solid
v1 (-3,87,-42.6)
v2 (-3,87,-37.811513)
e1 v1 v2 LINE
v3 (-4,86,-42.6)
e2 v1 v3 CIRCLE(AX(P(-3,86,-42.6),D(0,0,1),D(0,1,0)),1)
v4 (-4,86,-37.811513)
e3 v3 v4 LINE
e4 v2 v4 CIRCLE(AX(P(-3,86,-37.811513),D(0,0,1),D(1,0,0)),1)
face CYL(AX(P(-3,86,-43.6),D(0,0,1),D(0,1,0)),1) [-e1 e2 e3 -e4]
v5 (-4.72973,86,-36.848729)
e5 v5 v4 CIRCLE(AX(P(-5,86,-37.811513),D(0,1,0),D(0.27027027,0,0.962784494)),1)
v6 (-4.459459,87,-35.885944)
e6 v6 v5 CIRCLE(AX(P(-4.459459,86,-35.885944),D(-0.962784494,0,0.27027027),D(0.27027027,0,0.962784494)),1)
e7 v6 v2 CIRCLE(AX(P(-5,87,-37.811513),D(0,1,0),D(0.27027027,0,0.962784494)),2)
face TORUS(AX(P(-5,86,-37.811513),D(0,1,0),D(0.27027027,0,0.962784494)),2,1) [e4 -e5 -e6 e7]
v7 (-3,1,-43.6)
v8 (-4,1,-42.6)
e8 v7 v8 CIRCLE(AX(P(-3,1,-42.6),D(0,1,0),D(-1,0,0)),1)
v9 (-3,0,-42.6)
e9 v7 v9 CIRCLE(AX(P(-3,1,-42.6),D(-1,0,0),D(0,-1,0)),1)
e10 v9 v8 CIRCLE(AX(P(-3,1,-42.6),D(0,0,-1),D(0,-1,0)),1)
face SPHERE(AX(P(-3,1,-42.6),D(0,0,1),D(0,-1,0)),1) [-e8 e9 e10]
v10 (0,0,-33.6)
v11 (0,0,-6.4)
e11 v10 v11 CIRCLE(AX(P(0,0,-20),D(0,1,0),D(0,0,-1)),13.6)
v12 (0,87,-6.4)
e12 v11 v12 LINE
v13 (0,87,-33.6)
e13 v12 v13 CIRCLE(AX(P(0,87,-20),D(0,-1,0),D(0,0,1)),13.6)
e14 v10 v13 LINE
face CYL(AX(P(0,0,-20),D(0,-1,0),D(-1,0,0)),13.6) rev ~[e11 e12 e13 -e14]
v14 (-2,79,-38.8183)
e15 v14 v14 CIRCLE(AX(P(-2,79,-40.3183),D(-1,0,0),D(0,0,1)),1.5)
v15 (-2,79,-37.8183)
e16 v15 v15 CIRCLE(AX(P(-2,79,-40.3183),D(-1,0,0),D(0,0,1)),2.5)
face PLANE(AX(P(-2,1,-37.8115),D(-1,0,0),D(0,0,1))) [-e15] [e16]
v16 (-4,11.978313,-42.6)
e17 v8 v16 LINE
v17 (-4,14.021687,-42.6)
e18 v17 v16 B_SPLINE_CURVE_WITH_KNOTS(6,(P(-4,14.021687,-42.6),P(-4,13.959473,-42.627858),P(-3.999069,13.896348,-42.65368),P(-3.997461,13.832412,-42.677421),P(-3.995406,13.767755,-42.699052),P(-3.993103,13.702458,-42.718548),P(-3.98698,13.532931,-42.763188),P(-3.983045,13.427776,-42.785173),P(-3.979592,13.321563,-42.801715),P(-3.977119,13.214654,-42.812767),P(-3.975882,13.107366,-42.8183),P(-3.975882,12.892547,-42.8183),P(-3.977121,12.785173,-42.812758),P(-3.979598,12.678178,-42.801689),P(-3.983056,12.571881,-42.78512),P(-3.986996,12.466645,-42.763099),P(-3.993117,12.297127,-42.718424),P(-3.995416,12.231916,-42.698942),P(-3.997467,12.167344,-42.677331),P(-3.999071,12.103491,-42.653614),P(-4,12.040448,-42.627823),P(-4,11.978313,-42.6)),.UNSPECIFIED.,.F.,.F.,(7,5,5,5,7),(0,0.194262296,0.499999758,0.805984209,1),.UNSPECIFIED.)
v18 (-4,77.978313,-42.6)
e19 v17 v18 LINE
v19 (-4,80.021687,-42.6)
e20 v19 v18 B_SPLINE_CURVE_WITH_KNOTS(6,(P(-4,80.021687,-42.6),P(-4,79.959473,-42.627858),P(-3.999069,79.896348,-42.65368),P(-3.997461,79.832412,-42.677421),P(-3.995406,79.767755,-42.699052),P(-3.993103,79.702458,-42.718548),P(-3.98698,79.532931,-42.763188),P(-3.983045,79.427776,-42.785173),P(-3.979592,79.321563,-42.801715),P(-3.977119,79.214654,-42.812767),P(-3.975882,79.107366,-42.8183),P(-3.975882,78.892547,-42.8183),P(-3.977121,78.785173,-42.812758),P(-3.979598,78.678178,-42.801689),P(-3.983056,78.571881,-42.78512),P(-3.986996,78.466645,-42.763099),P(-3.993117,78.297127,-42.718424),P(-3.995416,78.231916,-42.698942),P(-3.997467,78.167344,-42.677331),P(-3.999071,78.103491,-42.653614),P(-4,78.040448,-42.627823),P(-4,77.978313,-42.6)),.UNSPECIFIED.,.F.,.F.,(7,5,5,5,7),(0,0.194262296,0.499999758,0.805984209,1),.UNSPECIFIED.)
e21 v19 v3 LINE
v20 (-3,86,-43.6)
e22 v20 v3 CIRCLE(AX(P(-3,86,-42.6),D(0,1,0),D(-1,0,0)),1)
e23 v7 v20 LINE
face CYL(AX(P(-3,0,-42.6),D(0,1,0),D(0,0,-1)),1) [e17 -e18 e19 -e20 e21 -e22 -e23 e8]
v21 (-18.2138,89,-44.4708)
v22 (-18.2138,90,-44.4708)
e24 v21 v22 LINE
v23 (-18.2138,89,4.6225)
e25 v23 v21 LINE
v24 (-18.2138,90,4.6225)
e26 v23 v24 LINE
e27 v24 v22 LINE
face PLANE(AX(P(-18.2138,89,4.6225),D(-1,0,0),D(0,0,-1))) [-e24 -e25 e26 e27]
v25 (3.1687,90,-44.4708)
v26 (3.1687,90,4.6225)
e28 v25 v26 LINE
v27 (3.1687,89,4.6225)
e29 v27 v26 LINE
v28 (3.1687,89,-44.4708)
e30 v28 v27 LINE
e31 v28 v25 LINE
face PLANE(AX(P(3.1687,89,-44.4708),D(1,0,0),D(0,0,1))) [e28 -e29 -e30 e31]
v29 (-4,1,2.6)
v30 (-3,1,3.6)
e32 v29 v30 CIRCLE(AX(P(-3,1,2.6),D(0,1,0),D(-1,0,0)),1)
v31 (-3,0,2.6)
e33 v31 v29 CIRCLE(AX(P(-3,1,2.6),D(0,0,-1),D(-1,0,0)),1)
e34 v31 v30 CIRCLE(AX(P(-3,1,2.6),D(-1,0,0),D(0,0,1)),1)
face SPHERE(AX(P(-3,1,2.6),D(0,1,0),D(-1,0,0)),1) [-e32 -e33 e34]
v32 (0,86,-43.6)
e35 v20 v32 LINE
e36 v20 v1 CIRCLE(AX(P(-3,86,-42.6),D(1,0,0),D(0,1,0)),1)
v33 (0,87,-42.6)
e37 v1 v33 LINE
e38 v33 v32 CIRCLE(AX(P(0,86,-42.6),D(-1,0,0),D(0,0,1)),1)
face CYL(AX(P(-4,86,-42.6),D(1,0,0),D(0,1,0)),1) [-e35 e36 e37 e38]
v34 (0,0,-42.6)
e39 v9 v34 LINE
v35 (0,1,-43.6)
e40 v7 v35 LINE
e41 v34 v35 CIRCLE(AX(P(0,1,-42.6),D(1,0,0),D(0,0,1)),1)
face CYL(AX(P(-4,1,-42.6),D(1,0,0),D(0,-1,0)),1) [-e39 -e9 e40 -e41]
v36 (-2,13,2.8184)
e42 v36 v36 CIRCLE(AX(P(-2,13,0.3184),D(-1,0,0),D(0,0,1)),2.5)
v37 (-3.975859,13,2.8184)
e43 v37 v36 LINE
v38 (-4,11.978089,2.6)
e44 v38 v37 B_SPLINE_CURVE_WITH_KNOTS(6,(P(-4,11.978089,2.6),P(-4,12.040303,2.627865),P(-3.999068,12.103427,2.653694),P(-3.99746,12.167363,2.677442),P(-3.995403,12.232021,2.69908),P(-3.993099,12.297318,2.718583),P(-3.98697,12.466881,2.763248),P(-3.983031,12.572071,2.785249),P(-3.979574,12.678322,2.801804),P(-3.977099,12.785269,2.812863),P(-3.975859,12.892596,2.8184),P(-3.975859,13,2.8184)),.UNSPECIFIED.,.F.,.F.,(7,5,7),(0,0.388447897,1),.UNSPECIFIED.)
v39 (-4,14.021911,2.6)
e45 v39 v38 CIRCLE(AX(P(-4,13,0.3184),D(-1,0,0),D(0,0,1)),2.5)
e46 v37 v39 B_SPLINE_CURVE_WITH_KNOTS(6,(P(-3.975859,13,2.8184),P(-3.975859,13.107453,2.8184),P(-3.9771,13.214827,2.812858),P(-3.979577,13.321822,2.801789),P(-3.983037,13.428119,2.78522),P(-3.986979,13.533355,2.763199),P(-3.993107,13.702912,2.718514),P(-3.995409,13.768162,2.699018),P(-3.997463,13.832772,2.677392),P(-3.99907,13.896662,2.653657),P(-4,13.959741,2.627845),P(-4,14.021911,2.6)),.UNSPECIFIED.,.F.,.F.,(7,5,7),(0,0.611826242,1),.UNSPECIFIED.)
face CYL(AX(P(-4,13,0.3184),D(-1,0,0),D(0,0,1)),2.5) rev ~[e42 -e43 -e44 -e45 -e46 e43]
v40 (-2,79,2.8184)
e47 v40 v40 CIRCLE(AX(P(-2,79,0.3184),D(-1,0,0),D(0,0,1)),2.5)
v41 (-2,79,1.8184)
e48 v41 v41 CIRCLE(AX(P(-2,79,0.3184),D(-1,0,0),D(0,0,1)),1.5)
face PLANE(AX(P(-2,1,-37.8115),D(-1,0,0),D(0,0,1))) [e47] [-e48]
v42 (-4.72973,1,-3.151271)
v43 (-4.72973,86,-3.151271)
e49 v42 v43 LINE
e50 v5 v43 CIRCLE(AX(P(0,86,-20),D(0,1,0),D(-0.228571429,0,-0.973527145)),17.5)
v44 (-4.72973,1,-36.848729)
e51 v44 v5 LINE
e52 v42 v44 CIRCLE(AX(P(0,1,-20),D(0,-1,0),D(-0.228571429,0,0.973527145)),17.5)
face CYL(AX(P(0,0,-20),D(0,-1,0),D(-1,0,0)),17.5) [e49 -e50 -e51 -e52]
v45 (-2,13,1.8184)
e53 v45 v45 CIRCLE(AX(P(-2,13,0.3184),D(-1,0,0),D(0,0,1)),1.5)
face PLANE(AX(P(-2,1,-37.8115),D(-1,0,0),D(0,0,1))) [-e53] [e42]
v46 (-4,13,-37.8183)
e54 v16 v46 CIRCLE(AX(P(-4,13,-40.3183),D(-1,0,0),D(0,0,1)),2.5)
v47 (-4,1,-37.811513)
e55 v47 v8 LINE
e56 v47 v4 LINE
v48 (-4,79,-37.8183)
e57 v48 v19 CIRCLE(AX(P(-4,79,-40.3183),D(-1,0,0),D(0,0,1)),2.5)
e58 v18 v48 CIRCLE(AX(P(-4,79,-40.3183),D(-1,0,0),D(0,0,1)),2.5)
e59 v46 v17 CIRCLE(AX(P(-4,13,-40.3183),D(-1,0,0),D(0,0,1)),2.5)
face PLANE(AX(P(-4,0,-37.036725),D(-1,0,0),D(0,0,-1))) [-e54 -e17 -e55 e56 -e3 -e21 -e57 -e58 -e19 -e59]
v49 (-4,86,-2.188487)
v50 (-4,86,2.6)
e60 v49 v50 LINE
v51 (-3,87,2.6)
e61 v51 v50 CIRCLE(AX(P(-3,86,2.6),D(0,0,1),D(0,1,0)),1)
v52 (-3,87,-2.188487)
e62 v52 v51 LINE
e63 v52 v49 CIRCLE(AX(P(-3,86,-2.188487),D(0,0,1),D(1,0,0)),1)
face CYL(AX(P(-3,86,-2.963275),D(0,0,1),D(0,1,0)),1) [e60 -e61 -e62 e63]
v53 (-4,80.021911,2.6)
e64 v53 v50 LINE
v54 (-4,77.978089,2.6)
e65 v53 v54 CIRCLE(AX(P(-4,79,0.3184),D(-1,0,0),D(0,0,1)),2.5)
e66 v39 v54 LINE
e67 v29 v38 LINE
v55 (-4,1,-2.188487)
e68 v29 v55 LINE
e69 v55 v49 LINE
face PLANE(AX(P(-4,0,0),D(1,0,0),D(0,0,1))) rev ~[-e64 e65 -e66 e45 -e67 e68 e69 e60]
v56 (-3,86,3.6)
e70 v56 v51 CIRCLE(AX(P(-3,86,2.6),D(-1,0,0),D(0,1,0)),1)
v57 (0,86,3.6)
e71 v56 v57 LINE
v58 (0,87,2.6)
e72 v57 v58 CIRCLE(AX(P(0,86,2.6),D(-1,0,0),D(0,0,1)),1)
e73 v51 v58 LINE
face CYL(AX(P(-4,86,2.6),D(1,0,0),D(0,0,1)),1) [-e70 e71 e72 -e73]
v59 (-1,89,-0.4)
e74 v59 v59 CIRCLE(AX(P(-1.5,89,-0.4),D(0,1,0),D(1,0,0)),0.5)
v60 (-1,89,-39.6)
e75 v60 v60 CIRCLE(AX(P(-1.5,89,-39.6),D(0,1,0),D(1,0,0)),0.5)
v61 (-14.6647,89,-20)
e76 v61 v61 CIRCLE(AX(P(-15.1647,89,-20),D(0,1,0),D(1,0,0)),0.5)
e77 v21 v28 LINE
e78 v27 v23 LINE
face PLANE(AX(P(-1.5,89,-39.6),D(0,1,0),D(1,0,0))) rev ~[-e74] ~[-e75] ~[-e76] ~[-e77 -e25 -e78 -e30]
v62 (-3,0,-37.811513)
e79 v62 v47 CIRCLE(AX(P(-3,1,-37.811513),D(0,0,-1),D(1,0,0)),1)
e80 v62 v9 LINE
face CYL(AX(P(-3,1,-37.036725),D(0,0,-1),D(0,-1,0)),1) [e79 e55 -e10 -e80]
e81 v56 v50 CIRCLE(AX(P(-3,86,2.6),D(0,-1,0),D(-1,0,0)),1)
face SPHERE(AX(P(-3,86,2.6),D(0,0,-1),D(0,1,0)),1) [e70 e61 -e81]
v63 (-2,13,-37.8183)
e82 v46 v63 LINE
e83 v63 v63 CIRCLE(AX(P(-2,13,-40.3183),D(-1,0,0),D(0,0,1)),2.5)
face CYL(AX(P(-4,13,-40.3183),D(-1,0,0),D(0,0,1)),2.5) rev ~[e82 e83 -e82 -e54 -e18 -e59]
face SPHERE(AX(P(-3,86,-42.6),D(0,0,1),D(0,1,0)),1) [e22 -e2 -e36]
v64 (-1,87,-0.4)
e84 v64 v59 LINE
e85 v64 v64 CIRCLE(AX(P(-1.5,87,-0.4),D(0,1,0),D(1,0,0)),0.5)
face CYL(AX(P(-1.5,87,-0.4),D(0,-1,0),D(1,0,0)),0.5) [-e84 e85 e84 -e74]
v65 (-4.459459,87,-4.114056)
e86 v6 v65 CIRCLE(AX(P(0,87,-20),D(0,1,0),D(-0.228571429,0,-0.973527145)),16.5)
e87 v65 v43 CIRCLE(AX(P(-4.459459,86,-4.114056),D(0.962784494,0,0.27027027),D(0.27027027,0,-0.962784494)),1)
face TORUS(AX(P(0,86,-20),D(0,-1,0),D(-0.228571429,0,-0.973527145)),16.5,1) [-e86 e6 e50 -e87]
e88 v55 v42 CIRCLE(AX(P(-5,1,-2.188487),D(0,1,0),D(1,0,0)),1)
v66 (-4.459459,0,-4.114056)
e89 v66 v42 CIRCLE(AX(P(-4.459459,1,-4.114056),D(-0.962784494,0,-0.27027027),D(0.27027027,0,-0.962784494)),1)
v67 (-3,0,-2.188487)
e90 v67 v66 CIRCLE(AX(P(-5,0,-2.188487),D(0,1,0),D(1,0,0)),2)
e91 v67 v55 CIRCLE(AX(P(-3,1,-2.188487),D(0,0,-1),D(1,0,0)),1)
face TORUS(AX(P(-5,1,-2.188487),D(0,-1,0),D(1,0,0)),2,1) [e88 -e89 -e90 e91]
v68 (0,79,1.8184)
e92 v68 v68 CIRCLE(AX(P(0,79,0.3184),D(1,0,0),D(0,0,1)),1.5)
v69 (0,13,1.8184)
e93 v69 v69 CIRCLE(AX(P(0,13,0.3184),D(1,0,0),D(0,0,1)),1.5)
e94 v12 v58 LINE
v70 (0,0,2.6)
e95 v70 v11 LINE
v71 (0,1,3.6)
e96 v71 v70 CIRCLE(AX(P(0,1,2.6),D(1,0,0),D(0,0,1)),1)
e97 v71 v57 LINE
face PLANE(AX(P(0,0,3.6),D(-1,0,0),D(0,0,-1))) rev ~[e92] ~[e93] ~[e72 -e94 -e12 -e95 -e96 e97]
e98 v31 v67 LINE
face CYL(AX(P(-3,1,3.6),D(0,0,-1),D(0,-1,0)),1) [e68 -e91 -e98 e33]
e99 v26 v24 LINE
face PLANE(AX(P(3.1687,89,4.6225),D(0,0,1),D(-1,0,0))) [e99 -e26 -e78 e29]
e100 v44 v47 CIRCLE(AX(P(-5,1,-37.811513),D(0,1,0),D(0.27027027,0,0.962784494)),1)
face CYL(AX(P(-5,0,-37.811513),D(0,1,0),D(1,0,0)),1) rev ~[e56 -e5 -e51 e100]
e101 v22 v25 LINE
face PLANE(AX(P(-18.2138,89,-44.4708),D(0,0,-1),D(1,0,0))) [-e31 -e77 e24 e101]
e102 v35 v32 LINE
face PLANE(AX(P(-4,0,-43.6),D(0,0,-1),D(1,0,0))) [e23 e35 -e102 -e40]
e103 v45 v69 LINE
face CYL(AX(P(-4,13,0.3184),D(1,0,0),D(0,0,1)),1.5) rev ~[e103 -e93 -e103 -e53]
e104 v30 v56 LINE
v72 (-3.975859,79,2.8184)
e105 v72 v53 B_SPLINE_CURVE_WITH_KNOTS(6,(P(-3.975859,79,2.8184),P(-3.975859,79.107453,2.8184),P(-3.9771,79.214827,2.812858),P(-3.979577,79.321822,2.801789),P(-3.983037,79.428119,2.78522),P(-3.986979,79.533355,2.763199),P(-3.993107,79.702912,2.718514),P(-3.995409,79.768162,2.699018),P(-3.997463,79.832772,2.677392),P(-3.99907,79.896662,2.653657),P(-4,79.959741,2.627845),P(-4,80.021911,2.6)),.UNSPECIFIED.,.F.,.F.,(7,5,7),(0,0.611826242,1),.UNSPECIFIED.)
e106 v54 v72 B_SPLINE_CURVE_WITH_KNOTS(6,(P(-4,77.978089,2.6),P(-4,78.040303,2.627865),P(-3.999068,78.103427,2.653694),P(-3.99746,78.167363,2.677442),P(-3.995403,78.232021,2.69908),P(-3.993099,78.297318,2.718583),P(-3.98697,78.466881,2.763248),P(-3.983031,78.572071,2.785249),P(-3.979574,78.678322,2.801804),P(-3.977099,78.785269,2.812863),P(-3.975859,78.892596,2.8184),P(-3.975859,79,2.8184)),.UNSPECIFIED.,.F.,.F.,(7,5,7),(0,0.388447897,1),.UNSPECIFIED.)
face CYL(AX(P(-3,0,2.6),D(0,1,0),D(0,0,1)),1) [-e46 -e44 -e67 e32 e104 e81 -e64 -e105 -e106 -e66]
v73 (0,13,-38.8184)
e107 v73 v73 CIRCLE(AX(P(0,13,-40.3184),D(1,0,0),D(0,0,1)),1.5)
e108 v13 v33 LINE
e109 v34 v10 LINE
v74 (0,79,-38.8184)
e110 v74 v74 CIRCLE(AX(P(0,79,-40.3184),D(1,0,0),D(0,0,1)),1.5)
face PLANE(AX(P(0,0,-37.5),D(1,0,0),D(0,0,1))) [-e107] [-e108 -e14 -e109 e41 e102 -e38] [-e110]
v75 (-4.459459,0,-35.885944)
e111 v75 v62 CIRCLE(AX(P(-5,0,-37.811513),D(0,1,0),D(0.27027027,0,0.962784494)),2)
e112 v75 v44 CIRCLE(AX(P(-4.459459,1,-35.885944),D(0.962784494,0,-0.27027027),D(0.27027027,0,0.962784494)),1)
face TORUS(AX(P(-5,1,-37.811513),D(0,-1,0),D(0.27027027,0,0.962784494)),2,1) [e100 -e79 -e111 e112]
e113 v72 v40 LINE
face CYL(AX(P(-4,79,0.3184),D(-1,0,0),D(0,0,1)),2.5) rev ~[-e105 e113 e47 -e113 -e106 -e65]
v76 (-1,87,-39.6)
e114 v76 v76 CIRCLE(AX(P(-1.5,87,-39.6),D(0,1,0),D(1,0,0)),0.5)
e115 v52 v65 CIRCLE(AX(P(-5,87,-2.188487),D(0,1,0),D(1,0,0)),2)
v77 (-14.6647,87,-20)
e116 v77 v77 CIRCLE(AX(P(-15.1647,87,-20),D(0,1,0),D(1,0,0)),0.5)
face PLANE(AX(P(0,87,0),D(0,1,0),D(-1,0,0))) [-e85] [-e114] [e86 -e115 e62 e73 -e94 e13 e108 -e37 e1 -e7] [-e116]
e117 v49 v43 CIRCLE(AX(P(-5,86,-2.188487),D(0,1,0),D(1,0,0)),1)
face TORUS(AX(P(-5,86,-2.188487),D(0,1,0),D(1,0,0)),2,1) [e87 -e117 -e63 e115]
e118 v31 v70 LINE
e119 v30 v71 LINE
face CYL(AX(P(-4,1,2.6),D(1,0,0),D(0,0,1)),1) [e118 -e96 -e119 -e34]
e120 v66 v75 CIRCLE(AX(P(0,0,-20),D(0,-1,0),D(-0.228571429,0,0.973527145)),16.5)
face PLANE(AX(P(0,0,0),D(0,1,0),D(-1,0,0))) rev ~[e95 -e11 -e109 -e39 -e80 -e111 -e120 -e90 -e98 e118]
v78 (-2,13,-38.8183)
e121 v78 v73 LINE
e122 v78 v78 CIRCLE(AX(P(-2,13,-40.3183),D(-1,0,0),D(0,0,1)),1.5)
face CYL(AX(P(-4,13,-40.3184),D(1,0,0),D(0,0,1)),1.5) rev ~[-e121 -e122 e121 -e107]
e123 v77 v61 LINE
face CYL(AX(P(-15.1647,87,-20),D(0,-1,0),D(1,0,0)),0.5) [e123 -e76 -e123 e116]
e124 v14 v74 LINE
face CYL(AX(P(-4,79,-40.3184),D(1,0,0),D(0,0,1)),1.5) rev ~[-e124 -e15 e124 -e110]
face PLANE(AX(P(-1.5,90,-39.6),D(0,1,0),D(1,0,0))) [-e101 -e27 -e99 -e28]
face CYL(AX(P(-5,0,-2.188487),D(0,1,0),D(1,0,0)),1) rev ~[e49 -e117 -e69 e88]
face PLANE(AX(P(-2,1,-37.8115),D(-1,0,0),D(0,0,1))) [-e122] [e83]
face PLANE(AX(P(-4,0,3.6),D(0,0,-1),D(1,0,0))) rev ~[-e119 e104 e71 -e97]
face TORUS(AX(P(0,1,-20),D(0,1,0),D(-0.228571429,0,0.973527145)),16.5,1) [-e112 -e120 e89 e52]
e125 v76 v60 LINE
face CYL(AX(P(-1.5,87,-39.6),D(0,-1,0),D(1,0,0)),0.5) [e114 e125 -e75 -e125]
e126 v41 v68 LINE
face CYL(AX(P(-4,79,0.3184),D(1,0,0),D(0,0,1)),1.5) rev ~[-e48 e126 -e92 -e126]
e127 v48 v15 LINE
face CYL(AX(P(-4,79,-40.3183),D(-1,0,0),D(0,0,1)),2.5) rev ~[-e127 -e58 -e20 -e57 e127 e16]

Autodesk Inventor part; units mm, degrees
ref_plane "YZ Plane" through (0, 0, 0) normal (1, 0, 0) x (0, 1, 0)
ref_plane "XZ Plane" through (0, 0, 0) normal (0, 1, 0) x (-1, 0, 0)
ref_plane "XY Plane" through (0, 0, 0) normal (0, 0, 1) x (1, 0, 0)
sketch "スケッチ1" plane through (0, 0, 0) normal (0, 1, 0) x (-1, 0, 0)
  line L0 (0, 0) -> (20, 0)
  line L1 (20, 0) -> (20, -40)
  line L2 (20, -40) -> (0, -40)
  line L3 (0, -40) -> (0, 0)
  circle A0 centre (0, -20) radius 13.6
  circle A1 centre (0, -20) radius 17.5
  line L4 (0, -6.4) -> (4, -6.4)
  line L5 (4, -6.4) -> (4, 3.6)
  line L6 (4, 3.6) -> (0, 3.6)
  line L7 (0, 3.6) -> (0, -6.4)
  line L8 (0, -33.6) -> (4, -33.6)
  line L9 (4, -33.6) -> (4, -43.6)
  line L10 (4, -43.6) -> (0, -43.6)
  line L11 (0, -43.6) -> (0, -33.6)
  point P0 (0, -6.4)
  point P1 (0, -33.6)
  point P2 (4, -37.0367)
  point P3 (4, -2.9633)
  dimension "d0" = 20
  dimension "d1" = 40
  dimension "d2" = 27.2
  dimension "d3" = 35
  dimension "d4" = 4
  dimension "d5" = 10
  dimension "d6" = 4
  dimension "d7" = 10
extrude "押し出し1" add sketch "スケッチ1" along normal blind 87 contours L7 L6 L5 L0 | L0 L5 A1 L3 | A1 L5 L4 L3 | A1 L9 L8 A0 L4 L5 | A1 L9 L2 L3 | L3 L8 L9 A1 | L2 L9 L10 L11
sketch "スケッチ2" plane through (-4, 0, -43.6) normal (-1, 0, 0) x (0, 0, 1)
  line L0 (0, 87) -> (6.5633, 87) projected
  line L1 (40.6367, 87) -> (47.2, 87) projected
  line L2 (40.6367, 0) -> (47.2, 0) projected
  line L3 (0, 0) -> (6.5633, 0) projected
  point P0 (43.6, 0)
  point P1 (3.2816, 13)
  point P2 (3.2816, 79)
  point P3 (43.9184, 79)
  point P4 (43.9184, 13)
  point P5 (3.2816, 87)
  point P6 (43.9184, 87)
  point P7 (43.9184, 0)
  point P8 (3.2816, 0)
  dimension "d10" = 0
  dimension "d11" = 8
  dimension "d12" = 0
  dimension "d13" = 8
  dimension "d14" = 0
  dimension "d15" = 0
  dimension "d16" = 13
  dimension "d17" = 13
hole "穴1" at (-4, 13, -40.3184) at (-4, 79, -40.3184) at (-4, 79, 0.3184) at (-4, 13, 0.3184) direction (1, 0, 0) diameter 3 end through all
fillet "フィレット1" radius 1 14 edges at (-4, 87, 0.3184) (-17.5, 87, -20) (-4, 87, -40.3184) (-2, 87, -43.6) (-2, 87, 3.6) (-4, 43.5, 3.6) (-4, 0, 0.3184) (-17.5, 0, -20) (-4, 0, -40.3184) (-2, 0, -43.6) (-2, 0, 3.6) (-4, 43.5, -43.6) (-4, 43.5, -37.0367) (-4, 43.5, -2.9633)
sketch "スケッチ3" plane through (0, 87, 0) normal (0, 1, 0) x (1, 0, 0)
  line L0 (0, -2.6) -> (-3, -2.6) projected
  line L1 (-3, 42.6) -> (0, 42.6) projected
  circle A0 centre (-1.5, 39.6) radius 0.5
  circle A1 centre (-1.5, 0.4) radius 0.5
  circle A2 centre (-15.1647, 20) radius 0.5
  arc A3 (-4.7297, 36.8487) -> (-4.7297, 3.1513) centre (0, 20) ccw projected
  point P0 (-17.5, 20)
  dimension "d28" = 3
  dimension "d29" = 3
  dimension "d30" = 1
  dimension "d31" = 1
  dimension "d32" = 1
  dimension "d33" = 0
extrude "押し出し2" add sketch "スケッチ3" along normal blind 2
sketch "スケッチ4" plane through (-1.5, 89, -39.6) normal (0, 1, 0) x (1, 0, 0)
  line L0 (-16.7138, 4.8708) -> (4.6687, 4.8708)
  line L1 (4.6687, 4.8708) -> (4.6687, -44.2225)
  line L2 (4.6687, -44.2225) -> (-16.7138, -44.2225)
  line L3 (-16.7138, -44.2225) -> (-16.7138, 4.8708)
  point P0 (1.5, -39.6)
extrude "押し出し3" add sketch "スケッチ4" along normal blind 1
sketch "スケッチ5" plane through (-4, 1, -37.8115) normal (-1, 0, 0) x (0, 0, 1)
  circle A0 centre (-2.5068, 12) radius 1.5 projected
  circle A1 centre (-2.5068, 12) radius 2.5
  circle A2 centre (38.1299, 12) radius 1.5 projected
  circle A3 centre (38.1299, 12) radius 2.5
  circle A4 centre (-2.5068, 78) radius 1.5 projected
  circle A5 centre (-2.5068, 78) radius 2.5
  circle A6 centre (38.1299, 78) radius 1.5 projected
  circle A7 centre (38.1299, 78) radius 2.5
  point P0 (37.8115, -1)
  dimension "d36" = 5
  dimension "d37" = 5
  dimension "d38" = 5
  dimension "d39" = 5
extrude "押し出し4" cut sketch "スケッチ5" against normal blind 2
properties part number "arm-2-2_3D プリント"
